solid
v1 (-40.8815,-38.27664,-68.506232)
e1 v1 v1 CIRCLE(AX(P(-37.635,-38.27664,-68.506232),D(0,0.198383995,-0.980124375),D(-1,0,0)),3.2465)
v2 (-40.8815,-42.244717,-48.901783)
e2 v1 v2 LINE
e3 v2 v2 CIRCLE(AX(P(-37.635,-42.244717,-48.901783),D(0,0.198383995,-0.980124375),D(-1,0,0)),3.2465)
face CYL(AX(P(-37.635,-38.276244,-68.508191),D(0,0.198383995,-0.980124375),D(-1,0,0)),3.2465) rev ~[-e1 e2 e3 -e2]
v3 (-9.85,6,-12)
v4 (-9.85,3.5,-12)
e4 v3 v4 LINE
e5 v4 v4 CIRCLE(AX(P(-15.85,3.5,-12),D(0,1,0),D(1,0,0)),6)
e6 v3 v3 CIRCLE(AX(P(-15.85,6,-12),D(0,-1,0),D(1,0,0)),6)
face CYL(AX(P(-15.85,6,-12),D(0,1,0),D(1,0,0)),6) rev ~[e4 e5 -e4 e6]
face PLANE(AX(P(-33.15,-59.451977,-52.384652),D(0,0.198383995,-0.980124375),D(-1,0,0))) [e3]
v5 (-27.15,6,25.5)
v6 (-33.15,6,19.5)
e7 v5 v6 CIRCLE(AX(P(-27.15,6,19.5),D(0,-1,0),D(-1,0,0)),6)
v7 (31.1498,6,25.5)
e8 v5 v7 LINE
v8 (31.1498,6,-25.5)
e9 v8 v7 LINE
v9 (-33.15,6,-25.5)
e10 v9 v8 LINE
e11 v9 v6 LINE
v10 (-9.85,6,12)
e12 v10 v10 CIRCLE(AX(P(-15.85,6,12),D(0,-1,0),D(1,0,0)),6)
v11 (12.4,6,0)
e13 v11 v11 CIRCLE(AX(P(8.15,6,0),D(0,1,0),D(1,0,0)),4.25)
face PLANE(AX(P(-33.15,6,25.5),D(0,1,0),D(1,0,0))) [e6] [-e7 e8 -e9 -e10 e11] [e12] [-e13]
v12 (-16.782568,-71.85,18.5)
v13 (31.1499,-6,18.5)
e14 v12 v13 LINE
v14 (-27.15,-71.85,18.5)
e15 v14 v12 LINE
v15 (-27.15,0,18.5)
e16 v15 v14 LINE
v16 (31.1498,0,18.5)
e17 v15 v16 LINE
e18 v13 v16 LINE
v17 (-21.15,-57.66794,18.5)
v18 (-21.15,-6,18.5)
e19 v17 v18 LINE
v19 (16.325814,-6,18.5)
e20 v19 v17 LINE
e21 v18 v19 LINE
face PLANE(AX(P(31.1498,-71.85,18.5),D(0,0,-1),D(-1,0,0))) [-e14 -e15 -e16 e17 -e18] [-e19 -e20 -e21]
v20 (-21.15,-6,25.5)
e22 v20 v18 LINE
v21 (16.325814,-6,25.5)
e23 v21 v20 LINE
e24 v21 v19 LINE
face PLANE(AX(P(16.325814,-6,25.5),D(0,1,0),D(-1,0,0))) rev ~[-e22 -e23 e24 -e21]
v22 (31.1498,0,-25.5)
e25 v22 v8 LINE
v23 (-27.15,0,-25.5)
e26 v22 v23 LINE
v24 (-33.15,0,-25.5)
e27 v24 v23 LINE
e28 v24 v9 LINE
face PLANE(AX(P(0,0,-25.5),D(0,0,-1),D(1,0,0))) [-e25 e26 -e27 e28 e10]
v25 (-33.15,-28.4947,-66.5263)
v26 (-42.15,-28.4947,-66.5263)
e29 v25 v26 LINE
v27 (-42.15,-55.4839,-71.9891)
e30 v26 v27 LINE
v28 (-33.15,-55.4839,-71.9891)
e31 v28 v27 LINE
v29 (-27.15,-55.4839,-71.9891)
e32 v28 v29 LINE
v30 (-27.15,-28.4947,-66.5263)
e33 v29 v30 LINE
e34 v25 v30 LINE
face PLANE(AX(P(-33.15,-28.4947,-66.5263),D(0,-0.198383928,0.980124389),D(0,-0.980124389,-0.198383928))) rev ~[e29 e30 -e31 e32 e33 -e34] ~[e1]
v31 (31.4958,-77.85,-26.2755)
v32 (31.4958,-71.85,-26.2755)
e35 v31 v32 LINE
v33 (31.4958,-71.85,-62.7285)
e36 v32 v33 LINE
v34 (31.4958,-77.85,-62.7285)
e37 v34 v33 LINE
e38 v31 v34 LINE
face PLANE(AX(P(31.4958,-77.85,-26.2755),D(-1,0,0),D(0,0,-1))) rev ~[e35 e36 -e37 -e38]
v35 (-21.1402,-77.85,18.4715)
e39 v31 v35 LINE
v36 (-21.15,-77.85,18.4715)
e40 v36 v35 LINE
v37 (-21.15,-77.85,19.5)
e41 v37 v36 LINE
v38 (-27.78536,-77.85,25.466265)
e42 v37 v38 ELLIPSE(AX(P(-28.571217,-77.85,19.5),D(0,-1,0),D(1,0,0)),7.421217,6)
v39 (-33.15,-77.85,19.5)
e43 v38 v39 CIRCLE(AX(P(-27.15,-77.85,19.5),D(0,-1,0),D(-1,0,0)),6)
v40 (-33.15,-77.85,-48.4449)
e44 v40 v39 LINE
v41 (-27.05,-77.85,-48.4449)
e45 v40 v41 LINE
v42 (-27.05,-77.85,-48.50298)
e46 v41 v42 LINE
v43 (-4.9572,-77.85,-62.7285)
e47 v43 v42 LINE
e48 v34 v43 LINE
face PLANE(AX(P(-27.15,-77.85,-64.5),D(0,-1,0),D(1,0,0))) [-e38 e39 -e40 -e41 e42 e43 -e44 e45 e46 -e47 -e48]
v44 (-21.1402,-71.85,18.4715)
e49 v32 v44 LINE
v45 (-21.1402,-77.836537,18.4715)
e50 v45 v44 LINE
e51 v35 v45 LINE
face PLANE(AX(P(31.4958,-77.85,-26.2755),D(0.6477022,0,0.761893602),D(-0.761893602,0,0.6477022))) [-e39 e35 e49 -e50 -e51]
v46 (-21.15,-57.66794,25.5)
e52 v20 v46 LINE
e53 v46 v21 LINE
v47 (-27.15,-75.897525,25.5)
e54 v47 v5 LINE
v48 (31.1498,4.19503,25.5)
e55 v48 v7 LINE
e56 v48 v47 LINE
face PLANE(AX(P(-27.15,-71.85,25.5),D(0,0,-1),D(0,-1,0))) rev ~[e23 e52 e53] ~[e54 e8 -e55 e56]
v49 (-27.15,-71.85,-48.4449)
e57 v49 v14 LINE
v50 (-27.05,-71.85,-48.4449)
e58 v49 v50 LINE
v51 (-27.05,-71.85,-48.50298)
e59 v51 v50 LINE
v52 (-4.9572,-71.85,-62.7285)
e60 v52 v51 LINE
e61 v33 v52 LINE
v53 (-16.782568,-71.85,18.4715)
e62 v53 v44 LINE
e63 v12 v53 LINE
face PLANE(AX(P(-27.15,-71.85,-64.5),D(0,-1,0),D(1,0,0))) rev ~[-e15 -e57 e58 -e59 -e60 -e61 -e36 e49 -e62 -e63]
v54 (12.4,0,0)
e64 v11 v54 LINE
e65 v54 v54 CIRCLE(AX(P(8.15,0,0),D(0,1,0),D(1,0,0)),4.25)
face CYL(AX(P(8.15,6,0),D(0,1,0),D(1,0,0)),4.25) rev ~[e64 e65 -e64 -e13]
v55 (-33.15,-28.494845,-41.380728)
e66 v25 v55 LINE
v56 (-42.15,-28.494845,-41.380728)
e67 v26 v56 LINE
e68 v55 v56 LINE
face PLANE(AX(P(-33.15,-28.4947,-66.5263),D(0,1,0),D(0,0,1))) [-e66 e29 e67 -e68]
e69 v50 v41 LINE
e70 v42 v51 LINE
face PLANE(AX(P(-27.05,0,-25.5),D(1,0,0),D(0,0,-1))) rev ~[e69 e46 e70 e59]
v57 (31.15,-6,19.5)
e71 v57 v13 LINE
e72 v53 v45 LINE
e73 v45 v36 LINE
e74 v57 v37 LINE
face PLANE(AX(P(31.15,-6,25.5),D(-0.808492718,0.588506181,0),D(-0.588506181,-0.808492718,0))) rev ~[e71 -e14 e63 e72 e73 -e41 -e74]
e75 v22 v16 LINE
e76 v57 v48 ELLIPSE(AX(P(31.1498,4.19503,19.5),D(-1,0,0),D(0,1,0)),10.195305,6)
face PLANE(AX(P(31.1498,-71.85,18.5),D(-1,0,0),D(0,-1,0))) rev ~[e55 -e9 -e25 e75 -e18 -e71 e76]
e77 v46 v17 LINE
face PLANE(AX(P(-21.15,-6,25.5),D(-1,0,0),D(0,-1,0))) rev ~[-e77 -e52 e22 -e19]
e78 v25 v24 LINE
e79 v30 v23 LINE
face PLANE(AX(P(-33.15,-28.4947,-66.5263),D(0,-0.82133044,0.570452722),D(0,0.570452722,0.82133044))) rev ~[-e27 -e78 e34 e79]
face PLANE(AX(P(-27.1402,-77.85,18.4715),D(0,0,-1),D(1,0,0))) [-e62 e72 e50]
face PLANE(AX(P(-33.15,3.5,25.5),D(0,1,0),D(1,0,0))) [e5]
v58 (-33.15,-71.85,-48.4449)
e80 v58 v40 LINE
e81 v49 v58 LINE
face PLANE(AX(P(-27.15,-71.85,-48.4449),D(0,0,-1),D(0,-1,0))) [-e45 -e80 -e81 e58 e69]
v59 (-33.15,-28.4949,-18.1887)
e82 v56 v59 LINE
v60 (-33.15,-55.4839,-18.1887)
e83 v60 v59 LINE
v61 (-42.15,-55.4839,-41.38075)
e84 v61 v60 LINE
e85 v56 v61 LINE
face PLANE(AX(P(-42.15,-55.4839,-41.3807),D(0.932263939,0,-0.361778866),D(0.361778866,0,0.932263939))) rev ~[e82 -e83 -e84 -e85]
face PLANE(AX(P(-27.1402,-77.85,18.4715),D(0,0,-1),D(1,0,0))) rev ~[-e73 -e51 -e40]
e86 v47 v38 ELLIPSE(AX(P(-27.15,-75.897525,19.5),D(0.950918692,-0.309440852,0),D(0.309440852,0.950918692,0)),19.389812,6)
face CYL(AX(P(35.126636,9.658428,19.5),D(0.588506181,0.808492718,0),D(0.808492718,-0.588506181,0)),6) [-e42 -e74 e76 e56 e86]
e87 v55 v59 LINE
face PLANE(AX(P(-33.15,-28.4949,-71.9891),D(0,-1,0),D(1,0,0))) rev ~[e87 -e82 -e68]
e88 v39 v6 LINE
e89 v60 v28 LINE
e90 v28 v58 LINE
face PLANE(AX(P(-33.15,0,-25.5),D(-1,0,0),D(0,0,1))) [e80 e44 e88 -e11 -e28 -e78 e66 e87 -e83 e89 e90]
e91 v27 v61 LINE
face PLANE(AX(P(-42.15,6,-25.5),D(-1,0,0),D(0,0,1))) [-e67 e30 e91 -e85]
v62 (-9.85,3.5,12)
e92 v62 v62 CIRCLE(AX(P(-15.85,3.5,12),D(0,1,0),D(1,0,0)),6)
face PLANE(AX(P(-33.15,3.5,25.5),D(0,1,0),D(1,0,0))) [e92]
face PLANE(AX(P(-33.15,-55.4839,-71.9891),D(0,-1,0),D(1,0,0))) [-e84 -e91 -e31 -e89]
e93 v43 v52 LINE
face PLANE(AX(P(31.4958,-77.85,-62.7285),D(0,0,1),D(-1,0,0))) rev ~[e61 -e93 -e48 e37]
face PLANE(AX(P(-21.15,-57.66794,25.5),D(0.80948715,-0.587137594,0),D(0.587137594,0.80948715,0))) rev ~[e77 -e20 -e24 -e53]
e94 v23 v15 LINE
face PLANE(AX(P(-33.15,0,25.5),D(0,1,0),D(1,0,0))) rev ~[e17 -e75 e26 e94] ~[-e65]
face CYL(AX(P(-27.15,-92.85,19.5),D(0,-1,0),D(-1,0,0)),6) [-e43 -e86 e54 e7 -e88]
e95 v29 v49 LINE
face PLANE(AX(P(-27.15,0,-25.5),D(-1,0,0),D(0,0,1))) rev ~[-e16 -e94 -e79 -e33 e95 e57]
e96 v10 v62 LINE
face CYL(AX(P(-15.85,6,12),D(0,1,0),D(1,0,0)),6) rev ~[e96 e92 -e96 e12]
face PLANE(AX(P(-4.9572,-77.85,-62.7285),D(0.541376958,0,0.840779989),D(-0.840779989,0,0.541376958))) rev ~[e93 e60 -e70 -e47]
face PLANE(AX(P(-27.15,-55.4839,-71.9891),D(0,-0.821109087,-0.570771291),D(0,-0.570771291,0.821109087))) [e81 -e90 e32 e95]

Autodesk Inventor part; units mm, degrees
ref_plane "YZ Plane" through (0, 0, 0) normal (1, 0, 0) x (0, 1, 0)
ref_plane "XZ Plane" through (0, 0, 0) normal (0, 1, 0) x (-1, 0, 0)
ref_plane "XY Plane" through (0, 0, 0) normal (0, 0, 1) x (1, 0, 0)
sketch "Sketch1" plane through (0, 0, 0) normal (0, 1, 0) x (-1, 0, 0)
  line L0 (0, -25.5) -> (-34.15, -25.5)
  line L1 (-34.15, -25.5) -> (-34.15, 0)
  line L2 (-34.15, 0) -> (-34.15, 25.5)
  line L3 (-34.15, 25.5) -> (0, 25.5)
  line L4 (0, 25.5) -> (34.15, 25.5)
  line L5 (34.15, 25.5) -> (34.15, 0)
  line L6 (34.15, 0) -> (34.15, -25.5)
  line L7 (34.15, -25.5) -> (0, -25.5)
  point P0 (0, 0)
extrude "Extrusion1" add sketch "Sketch1" along normal blind 7
sketch "Sketch3" plane through (-34.15, 0, 25.5) normal (0, 0, 1) x (1, 0, 0)
  line L0 (0, 0) -> (0, -78.85)
  point P0 (34.15, 0)
  dimension "d7" = 78.85
sketch "Sketch4" plane through (-34.15, 0, -25.5) normal (-1, 0, 0) x (0, 0, 1)
  line L0 (51, 0) -> (51, -78.85)
  line L1 (51, -78.85) -> (-39, -78.85)
  line L2 (-39, -78.85) -> (-39, -71.85)
  line L3 (0, 0) -> (-39, -71.85)
  line L4 (0, 0) -> (51, 0)
  point P0 (25.5, 0)
  dimension "d10" = 90
  dimension "d11" = 7
extrude "Extrusion2" add sketch "Sketch4" against normal blind 7
sketch "Sketch6" plane through (0, 7, 0) normal (0, 1, 0) x (1, 0, 0)
  line L0 (34.15, -25.5) -> (34.15, 25.5) projected
  line L1 (34.15, 25.5) -> (34.15, 0)
  line L2 (-34.15, 25.5) -> (-34.15, -25.5) projected
  circle A0 centre (8.15, 0) radius 5
  point P0 (0, 0)
  dimension "d20" = 10
extrude "Extrusion4" cut sketch "Sketch6" against normal blind 10
sketch "Sketch7" plane through (-27.15, 0, -25.5) normal (1, 0, 0) x (0, 0, -1)
  line L0 (-51, -78.85) -> (39, -78.85) projected
  line L1 (-51, -78.85) -> (39, -78.85)
  line L2 (39, -78.85) -> (39, -71.85) projected
  line L3 (39, -78.85) -> (39, -71.85)
  line L4 (39, -71.85) -> (-51, -71.85)
  line L5 (-51, 0) -> (-51, -78.85) projected
  line L6 (-51, -78.85) -> (-51, -71.85)
  point P0 (-25.5, 0)
sketch "Sketch8" plane through (0, 0, 0) normal (0, -1, 0) x (1, 0, 0)
  circle A0 centre (8.15, 0) radius 5 projected
  line L0 (8.15, 18.5) -> (34.15, 18.5)
  line L1 (34.15, 25.5) -> (34.15, -25.5) projected
  line L2 (8.15, 25.5) -> (34.15, 25.5)
  line L3 (8.15, 25.5) -> (-27.15, 25.5)
  line L4 (-27.15, 25.5) -> (-27.15, -25.5) projected
  line L5 (8.15, 18.5) -> (-27.15, 18.5)
  line L6 (34.15, 25.5) -> (34.15, 18.5)
  line L7 (-27.15, 25.5) -> (-27.15, 18.5)
  point P0 (0, 0)
extrude "Extrusion6" add sketch "Sketch7" along normal blind 58.5
extrude "Extrusion7" add sketch "Sketch8" along normal blind 78.75 contours L5 L4 L3 L2 L1 L0
sketch "Sketch9" plane through (31.35, 0, -25.5) normal (1, 0, 0) x (0, 0, -1)
  line L0 (-51, -78.75) -> (-51, 7) projected
  line L1 (-44, 0) -> (-44, -71.85) projected
  line L2 (-51, -78.75) -> (-44, -78.75)
  line L3 (-44, -78.75) -> (-44, -71.85)
  line L4 (-44, -71.85) -> (-51, -71.85)
  line L5 (-51, -71.85) -> (-51, -78.75)
  point P0 (-25.5, 0)
extrude "Extrusion8" cut sketch "Sketch9" along normal blind 10
sketch "Sketch10" plane through (0, 7, 0) normal (0, 1, 0) x (1, 0, 0)
  point P0 (0, 0)
sketch "Boceto11" plane through (-34.15, -78.85, -64.5) normal (0, -1, 0) x (1, 0, 0)
  line L0 (72.0718, 89.9914) -> (72.0718, 37.9883)
  line L1 (72.0718, 37.9883) -> (65.5278, 37.9883)
  line L2 (65.5278, 37.9883) -> (65.5278, 89.9914)
  line L3 (72.0718, 89.9914) -> (72.0718, 92.1751)
  line L4 (72.0718, 92.1751) -> (65.5278, 92.1751)
  line L5 (65.5278, 92.1751) -> (65.5278, 89.9914)
  point P0 (34.15, 64.5)
extrude "Extrusión9" cut sketch "Boceto11" against normal blind 1000
sketch "Boceto18" plane through (-34.15, -78.85, 25.5) normal (0, 0, 1) x (1, 0, 0)
  point P0 (34.15, 78.85)
sketch "Boceto23" plane through (-27.15, 0, -25.5) normal (0, 0.4770514, -0.8788754) x (-1, 0, 0)
  point P0 (-27.15, 12.1648)
sketch "Boceto24" plane through (-27.15, 0, -25.5) normal (0, 0, -1) x (-1, 0, 0)
  line L0 (7, -71.85) -> (7, -78.85) projected
  line L1 (7, -78.35) -> (7, -78.85)
  line L2 (7, -78.85) -> (-58.5, -78.85) projected
  line L3 (-58.5, -78.85) -> (-58.5, -77.85)
  line L4 (-58.5, -71.85) -> (-58.5, -78.85) projected
  line L5 (-58.5, -77.85) -> (6, -77.85)
  line L6 (7, -77.85) -> (7, -78.85)
  line L7 (7, -78.85) -> (-58.8392, -78.85)
  line L8 (-58.5278, 7) -> (7, 7) projected
  line L9 (7, -78.85) -> (7, 7)
  line L10 (7, 7) -> (6, 7)
  line L11 (6, 6) -> (6, -77.85)
  line L12 (-58.5278, -71.85) -> (-58.5278, 7) projected
  line L13 (-58.5278, 7) -> (-58.5278, 6)
  line L14 (-58.5278, 6) -> (6, 6)
  line L15 (7, 0) -> (7, 7) projected
  line L16 (7, 6) -> (7, 7)
  line L17 (7, 7) -> (-58.5278, 7)
  point P0 (-27.15, 0)
  dimension "d65" = 1
  dimension "d66" = 1
  dimension "d67" = 1
extrude "Extrusión19" cut sketch "Boceto24" along normal mid plane 1000
sketch "Boceto25" plane through (31.35, -71.85, -64.5) normal (0, 0, -1) x (-1, 0, 0)
  point P0 (31.35, 71.85)
sketch "Boceto27" plane through (31.3778, 0, -25.5) normal (0, 0, -1) x (-1, 0, 0)
  line L0 (0, -71.85) -> (0, 6) projected
  line L1 (0, 6) -> (0.228, 6)
  line L2 (0, 6) -> (64.5278, 6) projected
  line L3 (0.228, 6) -> (0.228, -77.85)
  line L4 (0.0278, -77.85) -> (64.5278, -77.85) projected
  line L5 (0.0278, -71.85) -> (0.0278, -77.85) projected
  line L6 (0.228, -77.85) -> (0.0278, -77.85)
  line L7 (0.0278, -77.85) -> (0, 6)
  line L8 (0, 6) -> (0, -77.85)
  line L9 (0, -77.85) -> (0.0278, -77.85)
  point P0 (31.3778, 0)
  dimension "d73" = 0.228
extrude "Extrusión21" cut sketch "Boceto27" along normal mid plane 1000
sketch "Boceto28" plane through (-33.15, 0, -25.5) normal (-1, 0, 0) x (0, 0, 1)
  point P0 (25.5, 0)
sketch "Boceto30" plane through (-33.15, 0, -25.5) normal (-1, 0, 0) x (0, 0, 1)
  point P0 (25.5, 0)
sketch "Boceto31" plane through (-33.15, 0, -25.5) normal (-1, 0, 0) x (0, 0, 1)
  circle A0 centre (64.38, -38.5153) radius 2.6
  point P0 (25.5, 0)
  point P1 (64.38, -49.4573)
sketch "Boceto32" plane through (-27.15, -71.85, 18.5) normal (0, 1, 0) x (1, 0, 0)
  circle A0 centre (47, 71.5) radius 5 projected
  circle A1 centre (47, 71.5) radius 5
  line L0 (52, 71.5) -> (58.2998, 71.5)
  line L1 (67, 83) -> (67, -7)
  line L2 (58.2998, -7) -> (-6, -7) projected
  line L3 (67, -7) -> (58.2998, -7)
  line L4 (58.2998, -7) -> (58.2998, 83)
  line L5 (47, 76.5) -> (47, 83)
  line L6 (-6, 83) -> (0, 83) projected
  line L7 (-6, 83) -> (-6, 91.5)
  line L8 (-6, 91.5) -> (67, 91.5)
  line L9 (67, 91.5) -> (67, 83)
  line L10 (-6, 83) -> (58.2998, 83)
  point P0 (27.15, 18.5)
extrude "Extrusión23" add sketch "Boceto32" against normal blind 6 contours L4 L10 L6 L7 L8 L9 L1 L3
sketch "Boceto33" plane through (-33.15, -77.85, 25.5) normal (-1, 0, 0) x (0, 0, 1)
  line L0 (0, 83.85) -> (0, 0) projected
  line L1 (0, 74.4354) -> (10.1255, 74.4354)
  line L2 (10.1255, 74.4354) -> (10.1255, 56.6115)
  line L3 (10.9445, 54.9975) -> (18.0243, 49.8171)
  line L4 (18.8039, 48.5979) -> (20.1084, 42.1205)
  line L5 (0, 11.6181) -> (18.1478, 11.6181)
  line L6 (20.1478, 13.6181) -> (20.1478, 41.7256)
  arc A0 (10.1255, 56.6115) -> (10.9445, 54.9975) centre (12.1255, 56.6115) ccw
  arc A1 (18.8039, 48.5979) -> (18.0243, 49.8171) centre (16.8433, 48.203) ccw
  arc A2 (20.1478, 41.7256) -> (20.1084, 42.1205) centre (18.1478, 41.7256) ccw
  arc A3 (18.1478, 11.6181) -> (20.1478, 13.6181) centre (18.1478, 13.6181) ccw
  point P0 (-25.5, 77.85)
  dimension "d91" = 2
extrude "Extrusión24" add sketch "Boceto33" against normal blind 6
extrude "Extrusión25" cut sketch "Boceto31" against normal blind 6
sketch "Boceto34" plane through (-27.15, -77.85, 25.5) normal (1, 0, 0) x (0, 0, -1)
  line L0 (-18.1478, 11.6181) -> (-21.8775, 11.6181)
  line L1 (-21.8775, 11.6181) -> (-21.8775, 48.067)
  line L2 (-21.8775, 48.067) -> (-10.1255, 56.8358)
  line L3 (-10.1255, 74.4354) -> (-10.1255, 56.6115) projected
  line L4 (-10.1255, 56.8358) -> (-10.1255, 48.9642)
  line L5 (-10.1255, 48.9642) -> (-16.6729, 42.1735)
  line L6 (-16.6729, 42.1735) -> (-18.1478, 11.6181)
  point P0 (25.5, 77.85)
extrude "Extrusión26" add sketch "Boceto34" against normal blind 6
fillet "Empalme5" radius 10 3 edges at (-30.15, -21.0142, 35.6255) (-30.15, -29.783, 47.3775) (-30.15, -66.2319, 47.3775)
sketch "Boceto37" plane through (-33.15, 6, 25.5) normal (0, 1, 0) x (1, 0, 0)
  circle A0 centre (41.3, 25.5) radius 6 projected
  line L0 (41.3, 25.5) -> (17.3, 25.5)
  line L1 (17.3, 25.5) -> (17.3, 13.5)
  line L2 (17.3, 13.5) -> (17.3, 37.5)
  circle A1 centre (17.3, 13.5) radius 6
  circle A2 centre (17.3, 37.5) radius 6
  point P0 (33.15, 25.5)
  dimension "d106" = 24
  dimension "d107" = 12
  dimension "d108" = 24
  dimension "d109" = 12
  dimension "d110" = 12
extrude "Extrusión29" cut sketch "Boceto37" against normal blind 2.5 contours A1 | A2
sketch "Boceto39" plane through (-27.15, -71.85, 18.5) normal (0, 1, 0) x (1, 0, 0)
  line L0 (58.2998, -7) -> (58.2998, 0)
  line L1 (58.2998, 44) -> (58.2998, 91.5)
  line L2 (-6, 91.5) -> (67, 91.5) projected
  line L3 (0, 0) -> (58.2998, 0) projected
  line L4 (58.2998, 0) -> (58.2998, -7) projected
  line L5 (58.2998, -7) -> (67, -7) projected
  line L6 (58.2998, -7) -> (67, -7)
  line L7 (67, 91.5) -> (-6, 91.5) projected
  line L8 (67, -7) -> (67, 91.5)
  line L9 (67, 91.5) -> (58.2998, 91.5)
  line L10 (58.2998, 0) -> (58.2998, 44)
  point P0 (27.15, 18.5)
extrude "Extrusión31" cut sketch "Boceto39" against normal blind 10
sketch "Boceto41" plane through (-27.15, -71.85, 18.5) normal (0, 1, 0) x (1, 0, 0)
  line L0 (58.2998, 91.5) -> (58.2998, -7) projected
  line L1 (58.2998, 91.5) -> (31.7998, 91.5)
  line L2 (31.7998, 91.5) -> (31.7998, 65)
  line L3 (31.7998, 65) -> (58.2998, 65)
  line L4 (58.2998, 65) -> (58.2998, 91.5)
  circle A0 centre (31.7998, 65) radius 6
  point P0 (27.15, 18.5)
  dimension "d124" = 26.5
  dimension "d125" = 26.5
  dimension "d126" = 12
extrude "Extrusión32" cut sketch "Boceto41" against normal blind 10 contours A0 L2 L3 | L3 L2 A0
sketch "Sketch42" plane through (-27.15, -71.85, 18.5) normal (0, 1, 0) x (1, 0, 0)
  circle A0 centre (31.7998, 65) radius 6 projected
  line L0 (31.7998, 71) -> (31.7998, 65)
  circle A1 centre (31.7998, 65) radius 18
  line L1 (0, 0) -> (0, 83) projected
  line L2 (0, 83) -> (31.7998, 83)
  line L3 (58.2998, 91.5) -> (-6, 91.5) projected
  line L4 (49.7998, 65) -> (49.7998, 0)
  line L5 (58.2998, 0) -> (0, 0) projected
  line L6 (0, 0) -> (58.2998, 0) projected
  line L7 (49.7998, 0) -> (58.2998, 0)
  line L8 (58.2998, 91.5) -> (58.2998, -7) projected
  line L9 (58.2998, 0) -> (58.2998, 91.5)
  line L10 (0, 83) -> (0, 44) projected
  line L11 (0, 83) -> (-6, 83)
  line L12 (-6, 91.5) -> (-6, 83) projected
  line L13 (-6, 83) -> (-6, 91.5)
  line L14 (58.2998, 91.5) -> (58.2998, 0) projected
  line L15 (-6, 91.5) -> (58.2998, 91.5)
  point P0 (27.15, 18.5)
  point P1 (58.2998, -7)
  dimension "d129" = 36
extrude "Extrusion33" cut sketch "Sketch42" against normal blind 10 contours A1 L2 L11 L12 L3 L8 L5 L4
sketch "Sketch43" plane through (-27.15, -71.85, 18.5) normal (0, 0, -1) x (-1, 0, 0)
  line L0 (6, -6) -> (-58.2998, -6) projected
  line L1 (0, 0) -> (-49.7998, 0) projected
  line L2 (-58.2998, -6) -> (-49.7998, -6)
  line L3 (-49.7998, -6) -> (-49.7998, 0)
  line L4 (-49.7998, 0) -> (-58.2998, 0)
  line L5 (-58.2998, 0) -> (-58.2998, -6)
  point P0 (-27.15, 71.85)
extrude "Extrusion34" add sketch "Sketch43" along normal blind 20
fillet "Fillet7" radius 7 1 edges at (31.1498, -74.85, -1.5)
fillet "Fillet8" radius 2 1 edges at (22.6498, -74.85, -1.5)
sketch "Sketch44" plane through (-33.15, 0, -25.5) normal (-1, 0, 0) x (0, 0, 1)
  line L0 (68.8577, -26.7837) -> (65.1452, -24.0136) projected
  line L1 (61.1255, -3.4146) -> (51, -3.4146) projected
  line L2 (65.1452, -24.0136) -> (51, -24.0136)
  line L3 (51, -24.0136) -> (51, -3.4146)
  line L4 (51, -3.4146) -> (65.1452, -3.4146)
  line L5 (65.1452, -3.4146) -> (65.1452, -24.0136)
  point P0 (25.5, 0)
extrude "Extrusion35" cut sketch "Sketch44" against normal blind 20
sketch "Sketch45" plane through (-33.15, 6, 25.5) normal (0, 1, 0) x (1, 0, 0)
  circle A0 centre (41.3, 25.5) radius 5 projected
  circle A1 centre (41.3, 25.5) radius 4.25
  circle A2 centre (41.3, 25.5) radius 5
  point P0 (33.15, 25.5)
  dimension "d138" = 8.5
extrude "Extrusion36" add sketch "Sketch45" against normal blind 6
sketch "Sketch46" plane through (-33.15, 0, -25.5) normal (-1, 0, 0) x (0, 0, 1)
  point P0 (25.5, 0)
sketch "Sketch47" plane through (-33.15, 0, -25.5) normal (-1, 0, 0) x (0, 0, 1)
  line L0 (-44.1201, -43.7798) -> (-41.0263, -28.4947)
  line L1 (-39, -71.85) -> (0, 0) projected
  line L2 (-41.0263, -28.4947) -> (0, 0)
  line L3 (0, 0) -> (-39, -71.85)
  line L4 (-44.1201, -43.7798) -> (-44.1201, -71.85)
  line L5 (-44.1201, -71.85) -> (-39, -71.85)
  point P0 (25.5, 0)
extrude "Extrusion37" add sketch "Sketch47" against normal blind 6
sketch "Sketch48" plane through (-33.15, 6, -25.5) normal (-1, 0, 0) x (0, 0, 1)
  point P0 (25.5, -6)
sketch "Sketch49" plane through (-33.15, 6, -25.5) normal (-1, 0, 0) x (0, 0, 1)
  point P0 (25.5, -6)
sketch "Sketch50" plane through (-33.15, 6, -25.5) normal (-1, 0, 0) x (0, 0, 1)
  line L0 (-44.1201, -49.7798) -> (-41.0263, -34.4947) projected
  line L1 (-41.0263, -34.4947) -> (-46.4891, -61.4839)
  line L2 (-39, -83.85) -> (51, -83.85) projected
  line L3 (-39, -83.85) -> (-46.4891, -83.85)
  line L4 (-46.4891, -83.85) -> (-46.4891, -61.4839)
  line L5 (-41.0263, -34.4947) -> (-39, -69.2782)
  line L6 (-39, -69.2782) -> (-39, -83.85)
  point P0 (25.5, -6)
extrude "Extrusion38" add sketch "Sketch50" against normal blind 6
sketch "Sketch51" plane through (-33.15, 6, -25.5) normal (-1, 0, 0) x (0, 0, 1)
  line L0 (-41.0263, -34.4947) -> (-46.4891, -61.4839) projected
  line L1 (-41.0263, -34.4947) -> (-46.4891, -61.4839)
  line L2 (-46.4891, -61.4839) -> (-15.8808, -61.4839)
  line L3 (-41.0263, -34.4947) -> (-15.8808, -34.4947)
  line L4 (-15.8808, -34.4947) -> (-15.8808, -61.4839)
  point P0 (25.5, -6)
extrude "Extrusion39" add sketch "Sketch51" along normal blind 9
sketch "Sketch52" plane through (-33.15, -55.4839, -71.9891) normal (0, -1, 0) x (1, 0, 0)
  line L0 (-9, 30.6084) -> (0, 53.8004)
  line L1 (0, 0) -> (0, 97.4891) projected
  line L2 (0, 30.6084) -> (0, 53.8004)
  line L3 (0, 30.6084) -> (-9, 30.6084)
  point P0 (33.15, 71.9891)
extrude "Extrusion40" add sketch "Sketch52" against normal blind 26.989
sketch "Sketch53" plane through (-33.15, -55.4839, -18.1887) normal (-0.9322642, 0, 0.3617781) x (0.3617781, 0, 0.9322642)
  point P0 (28.9496, 55.4839)
sketch "Sketch54" plane through (-33.15, 6, -25.5) normal (-1, 0, 0) x (0, 0, 1)
  line L0 (51, -72.2319) -> (51, -83.85) projected
  line L1 (51, -83.85) -> (86.3988, -83.85)
  line L2 (86.3988, -83.85) -> (86.3988, -18.2813)
  line L3 (86.3988, -18.2813) -> (51, -18.2813)
  line L4 (51, -18.2813) -> (51, -83.85)
  point P0 (25.5, -6)
extrude "Extrusion41" cut sketch "Sketch54" against normal blind 26.989
sketch "Sketch55" plane through (-33.15, -55.4839, -71.9891) normal (0, 0.198384, -0.9801244) x (-1, 0, 0)
  line L0 (9, 6.0722) -> (9, 32.5248) projected
  line L1 (9, 17.5562) -> (4.485, 17.5562)
  line L2 (9, 17.5562) -> (13.515, 17.5562) construction
  circle A0 centre (4.485, 17.5562) radius 3.2465
  point P0 (-33.15, 68.6627)
  dimension "d153" = 4.515
  dimension "d154" = 180
  dimension "d155" = 6.493
extrude "Extrusion42" cut sketch "Sketch55" against normal blind 20
sketch "Sketch56" plane through (-33.15, -77.85, 25.5) normal (0, 0, 1) x (1, 0, 0)
  line L0 (0, 77.85) -> (0, 83.85) projected
  line L1 (0, 83.85) -> (12, 83.85)
  line L2 (64.2998, 83.85) -> (0, 83.85) projected
  line L3 (12, 83.85) -> (12, 0)
  line L4 (6, 0) -> (37.7998, 0) projected
  line L5 (0, 83.85) -> (0, 0) projected
  line L6 (12, 0) -> (0, 0)
  line L7 (0, 0) -> (0, 83.85)
  line L8 (0, 83.85) -> (12, 83.85)
  line L9 (12, 83.85) -> (12, 0)
  line L10 (0, 83.85) -> (64.3, 83.85)
  line L11 (64.3, 83.85) -> (64.3, 71.85)
  line L12 (64.3, 71.85) -> (0, 71.85)
  line L13 (0, 71.85) -> (0, 83.85)
  line L14 (64.2998, 0) -> (64.2998, 83.85) projected
  line L15 (64.3, 71.85) -> (12, 0)
  line L16 (64.3, 71.85) -> (54.5981, 78.9121)
  line L17 (12, 0) -> (3.5198, 8.4904)
  line L18 (3.5198, 8.4904) -> (54.5981, 78.9121)
  line L19 (12, 0) -> (64.2998, 0)
  line L20 (64.3, 71.85) -> (64.2998, 0)
  point P0 (33.15, 77.85)
  point P1 (37.7998, 0)
  point P2 (64.2998, 71.8497)
  point P3 (12, 20.182)
  point P4 (49.4758, 71.85)
  point P5 (12, 71.85)
  dimension "d158" = 12
  dimension "d159" = 64.3
  dimension "d160" = 12
  dimension "d161" = 12
  dimension "d162" = 12
extrude "Extrusion43" cut sketch "Sketch56" against normal blind 20 contours L12 L18 L3 | L14 L19 L4 L15
sketch "Sketch57" plane through (-27.15, -77.85, -64.5) normal (0, -1, 0) x (1, 0, 0)
  point P0 (27.15, 64.5)
sketch "Sketch58" plane through (-27.15, -77.85, -64.5) normal (0, -1, 0) x (1, 0, 0)
  line L0 (0.0098, 82.9715) -> (6.0098, 82.9715)
  line L1 (0.0098, 82.9715) -> (58.6458, 82.9715)
  line L2 (58.6458, 82.9715) -> (58.6458, -19.949)
  line L3 (58.6458, -19.949) -> (0.0098, -19.949)
  line L4 (0.0098, -19.949) -> (0.0098, 82.9715)
  line L5 (58.6458, 1.7715) -> (22.1928, 1.7715)
  line L6 (22.1928, 1.7715) -> (0.0098, 16.0551)
  line L7 (0.0098, 16.0551) -> (0.0098, 82.9715)
  line L8 (58.6458, 1.7715) -> (58.6458, 39.0076)
  line L9 (58.6458, 1.7715) -> (22.1928, 1.7715)
  line L10 (58.6458, 38.2245) -> (58.6458, 1.7715)
  line L11 (58.6458, 38.2245) -> (6.0098, 82.9715)
  point P0 (15.0563, 101.6492)
extrude "Extrusion44" add sketch "Sketch58" against normal blind 6
extrude "Extrusion45" cut sketch "Sketch58" against normal blind 6
extrude "Extrusion46" add sketch "Sketch58" against normal blind 6 contours L0 L11 L2 L5 L6 L4
sketch "Sketch59" plane through (-27.15, 0, -25.5) normal (1, 0, 0) x (0, 0, -1)
  line L0 (46.4891, -77.85) -> (46.4891, -55.4839) projected
  line L1 (22.9449, -71.85) -> (22.9449, -77.85) projected
  line L2 (46.4891, -55.4839) -> (22.9449, -71.85)
  line L3 (22.9449, -71.85) -> (22.9449, -77.85)
  line L4 (22.9449, -77.85) -> (46.4891, -77.85)
  line L5 (46.4891, -55.4839) -> (46.4891, -77.85) projected
  line L6 (46.4891, -77.85) -> (46.4891, -55.4839)
  line L7 (46.4891, -55.4839) -> (46.4891, -77.85)
  point P0 (-25.5, 0)
extrude "Extrusion47" cut sketch "Sketch59" along normal blind 0.1 and the other way blind 6
fillet "Fillet9" radius 6 2 edges at (4.9999, -41.9251, 25.5) (-33.15, -35.925, 25.5)
properties part number "AC23[I3][R]" material "Aluminio 6061"
